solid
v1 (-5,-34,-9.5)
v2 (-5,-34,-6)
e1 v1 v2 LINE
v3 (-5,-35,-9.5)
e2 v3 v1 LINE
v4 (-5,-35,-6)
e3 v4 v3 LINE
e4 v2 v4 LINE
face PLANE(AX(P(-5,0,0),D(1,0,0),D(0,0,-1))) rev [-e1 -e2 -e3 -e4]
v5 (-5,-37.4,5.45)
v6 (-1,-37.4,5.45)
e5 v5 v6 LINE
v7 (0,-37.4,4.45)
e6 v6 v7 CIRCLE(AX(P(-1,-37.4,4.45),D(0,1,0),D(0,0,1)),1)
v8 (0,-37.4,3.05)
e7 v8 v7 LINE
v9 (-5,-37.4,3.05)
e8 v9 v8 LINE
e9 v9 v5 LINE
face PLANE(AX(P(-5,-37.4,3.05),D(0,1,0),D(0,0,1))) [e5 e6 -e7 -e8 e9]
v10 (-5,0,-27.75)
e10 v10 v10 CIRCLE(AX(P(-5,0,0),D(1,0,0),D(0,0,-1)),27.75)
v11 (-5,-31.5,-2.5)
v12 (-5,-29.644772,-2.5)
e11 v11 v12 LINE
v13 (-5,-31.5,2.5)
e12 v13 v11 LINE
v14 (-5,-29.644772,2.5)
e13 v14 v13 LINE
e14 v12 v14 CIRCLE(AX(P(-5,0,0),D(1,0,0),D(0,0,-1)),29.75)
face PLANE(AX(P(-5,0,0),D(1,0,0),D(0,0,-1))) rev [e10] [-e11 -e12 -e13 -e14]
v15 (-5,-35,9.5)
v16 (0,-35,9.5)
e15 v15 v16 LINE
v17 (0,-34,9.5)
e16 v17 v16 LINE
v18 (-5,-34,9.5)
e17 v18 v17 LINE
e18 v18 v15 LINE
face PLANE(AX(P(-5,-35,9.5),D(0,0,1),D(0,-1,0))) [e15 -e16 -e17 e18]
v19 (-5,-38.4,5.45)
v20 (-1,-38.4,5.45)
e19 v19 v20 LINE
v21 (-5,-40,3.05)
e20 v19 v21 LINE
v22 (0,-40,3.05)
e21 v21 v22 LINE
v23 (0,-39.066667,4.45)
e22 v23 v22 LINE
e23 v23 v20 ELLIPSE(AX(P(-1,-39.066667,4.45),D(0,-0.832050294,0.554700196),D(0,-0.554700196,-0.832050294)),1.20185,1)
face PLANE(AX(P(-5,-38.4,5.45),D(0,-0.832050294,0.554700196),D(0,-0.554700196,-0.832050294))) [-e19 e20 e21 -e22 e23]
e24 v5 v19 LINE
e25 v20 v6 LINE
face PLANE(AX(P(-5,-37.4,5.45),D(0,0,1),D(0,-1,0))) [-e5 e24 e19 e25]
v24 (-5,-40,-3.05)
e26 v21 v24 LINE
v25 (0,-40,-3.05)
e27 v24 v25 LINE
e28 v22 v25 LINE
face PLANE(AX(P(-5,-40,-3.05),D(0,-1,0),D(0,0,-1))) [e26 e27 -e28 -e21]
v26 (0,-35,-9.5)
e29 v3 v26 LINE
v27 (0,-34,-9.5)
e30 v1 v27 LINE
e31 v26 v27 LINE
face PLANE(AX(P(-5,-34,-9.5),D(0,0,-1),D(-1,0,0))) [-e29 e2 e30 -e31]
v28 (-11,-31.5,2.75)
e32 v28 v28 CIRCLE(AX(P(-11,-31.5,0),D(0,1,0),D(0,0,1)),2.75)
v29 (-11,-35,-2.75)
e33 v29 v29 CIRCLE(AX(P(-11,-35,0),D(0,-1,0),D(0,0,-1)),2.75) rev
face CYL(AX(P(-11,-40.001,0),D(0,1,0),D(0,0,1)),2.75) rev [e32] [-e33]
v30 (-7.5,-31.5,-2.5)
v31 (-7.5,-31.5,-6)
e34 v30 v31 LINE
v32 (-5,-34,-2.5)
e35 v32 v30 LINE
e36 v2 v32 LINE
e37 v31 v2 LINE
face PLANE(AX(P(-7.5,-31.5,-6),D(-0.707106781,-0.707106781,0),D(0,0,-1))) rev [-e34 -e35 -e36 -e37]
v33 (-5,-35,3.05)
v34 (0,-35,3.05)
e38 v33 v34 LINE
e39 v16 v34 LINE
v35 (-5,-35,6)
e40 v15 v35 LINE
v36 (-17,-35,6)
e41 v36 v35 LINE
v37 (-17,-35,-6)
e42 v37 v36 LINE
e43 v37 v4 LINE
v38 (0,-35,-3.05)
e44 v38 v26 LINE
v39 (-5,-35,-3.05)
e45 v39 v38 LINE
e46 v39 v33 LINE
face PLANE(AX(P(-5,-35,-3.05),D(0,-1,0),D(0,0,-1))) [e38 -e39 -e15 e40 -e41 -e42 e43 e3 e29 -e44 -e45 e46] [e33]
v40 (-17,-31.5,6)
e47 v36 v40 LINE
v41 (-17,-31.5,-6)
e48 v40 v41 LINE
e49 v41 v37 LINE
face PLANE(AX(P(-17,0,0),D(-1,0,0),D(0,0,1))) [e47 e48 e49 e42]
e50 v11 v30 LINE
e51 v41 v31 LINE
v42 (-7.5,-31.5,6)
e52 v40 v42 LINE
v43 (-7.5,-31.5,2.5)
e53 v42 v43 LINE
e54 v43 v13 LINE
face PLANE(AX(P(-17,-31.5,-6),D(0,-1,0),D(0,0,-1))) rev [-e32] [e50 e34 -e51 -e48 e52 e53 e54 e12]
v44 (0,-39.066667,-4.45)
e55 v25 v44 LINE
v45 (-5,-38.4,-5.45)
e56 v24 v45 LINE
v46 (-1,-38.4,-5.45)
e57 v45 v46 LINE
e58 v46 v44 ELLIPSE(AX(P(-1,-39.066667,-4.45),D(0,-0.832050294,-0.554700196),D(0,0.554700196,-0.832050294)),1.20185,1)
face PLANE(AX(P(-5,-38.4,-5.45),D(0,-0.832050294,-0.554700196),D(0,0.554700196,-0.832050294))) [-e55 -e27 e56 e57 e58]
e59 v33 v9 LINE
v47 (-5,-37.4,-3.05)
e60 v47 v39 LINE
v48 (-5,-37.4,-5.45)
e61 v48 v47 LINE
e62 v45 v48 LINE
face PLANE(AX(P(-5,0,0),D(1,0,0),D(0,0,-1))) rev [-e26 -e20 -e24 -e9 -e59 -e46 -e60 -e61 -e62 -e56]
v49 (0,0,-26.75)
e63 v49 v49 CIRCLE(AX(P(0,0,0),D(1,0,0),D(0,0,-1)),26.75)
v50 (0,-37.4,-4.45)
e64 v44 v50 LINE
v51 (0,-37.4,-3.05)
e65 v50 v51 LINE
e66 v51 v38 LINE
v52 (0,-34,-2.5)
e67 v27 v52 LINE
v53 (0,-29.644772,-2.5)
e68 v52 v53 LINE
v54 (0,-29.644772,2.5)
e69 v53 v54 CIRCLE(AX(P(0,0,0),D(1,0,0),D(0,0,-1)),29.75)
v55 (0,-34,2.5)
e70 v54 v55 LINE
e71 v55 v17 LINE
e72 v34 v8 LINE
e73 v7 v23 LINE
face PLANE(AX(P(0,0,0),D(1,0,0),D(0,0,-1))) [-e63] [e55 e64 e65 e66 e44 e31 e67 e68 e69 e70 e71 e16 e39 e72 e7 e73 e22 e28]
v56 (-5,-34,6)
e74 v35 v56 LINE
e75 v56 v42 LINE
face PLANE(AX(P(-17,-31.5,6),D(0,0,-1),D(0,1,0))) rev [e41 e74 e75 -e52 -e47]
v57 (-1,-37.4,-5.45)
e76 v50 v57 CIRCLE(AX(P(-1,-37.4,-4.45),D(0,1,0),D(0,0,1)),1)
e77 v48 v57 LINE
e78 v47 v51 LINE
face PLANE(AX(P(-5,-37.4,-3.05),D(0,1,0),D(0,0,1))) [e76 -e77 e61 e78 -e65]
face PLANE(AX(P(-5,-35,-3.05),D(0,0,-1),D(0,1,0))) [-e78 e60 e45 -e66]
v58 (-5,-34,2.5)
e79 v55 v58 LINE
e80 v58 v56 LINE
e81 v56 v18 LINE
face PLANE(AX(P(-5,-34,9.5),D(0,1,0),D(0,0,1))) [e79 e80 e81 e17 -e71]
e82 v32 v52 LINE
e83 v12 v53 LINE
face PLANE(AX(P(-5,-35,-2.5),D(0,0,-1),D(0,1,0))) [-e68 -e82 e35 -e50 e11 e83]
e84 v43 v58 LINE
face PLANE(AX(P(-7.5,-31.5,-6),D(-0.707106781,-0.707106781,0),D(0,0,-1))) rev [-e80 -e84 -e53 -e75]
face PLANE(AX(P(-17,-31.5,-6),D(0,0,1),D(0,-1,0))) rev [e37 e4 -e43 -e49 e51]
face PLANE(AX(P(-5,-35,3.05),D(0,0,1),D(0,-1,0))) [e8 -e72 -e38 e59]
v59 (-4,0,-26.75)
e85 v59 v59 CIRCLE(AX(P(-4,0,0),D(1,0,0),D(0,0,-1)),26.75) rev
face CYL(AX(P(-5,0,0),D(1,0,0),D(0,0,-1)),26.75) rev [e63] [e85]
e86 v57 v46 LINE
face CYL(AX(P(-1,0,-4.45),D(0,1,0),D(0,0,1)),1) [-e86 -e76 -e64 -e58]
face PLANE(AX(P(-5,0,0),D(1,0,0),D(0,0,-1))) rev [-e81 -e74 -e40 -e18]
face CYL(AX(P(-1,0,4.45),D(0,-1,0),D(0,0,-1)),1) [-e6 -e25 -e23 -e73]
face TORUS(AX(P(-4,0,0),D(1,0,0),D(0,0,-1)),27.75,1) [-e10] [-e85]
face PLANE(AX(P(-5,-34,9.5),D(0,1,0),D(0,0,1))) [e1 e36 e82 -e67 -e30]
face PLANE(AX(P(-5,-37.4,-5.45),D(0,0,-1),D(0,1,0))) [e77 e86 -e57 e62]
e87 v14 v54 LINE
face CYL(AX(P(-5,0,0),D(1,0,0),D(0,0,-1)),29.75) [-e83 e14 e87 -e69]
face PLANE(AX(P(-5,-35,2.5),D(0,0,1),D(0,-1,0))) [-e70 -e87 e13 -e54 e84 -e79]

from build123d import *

# Parameters (mm, degrees)
SKETCH1_R            = 29.75
SKETCH1_R_2          = 26.75
BOSS_EXTRUDE1_DEPTH  = 5
SKETCH2_W            = 5
SKETCH2_H            = 5.355228117
BOSS_EXTRUDE2_DEPTH  = 5
BOSS_EXTRUDE3_DEPTH  = 5
FILLET1_R            = 1
SKETCH38_W           = 12
SKETCH38_H           = 3.5
BOSS_EXTRUDE28_DEPTH = 12
CUT_EXTRUDE3_REACH   = 72.183
SKETCH39_R           = 2.75
CHAMFER1_SIZE        = 2.5
FILLET3_R            = 1


with BuildPart() as part:
    # Sketch1 → Boss-Extrude1 (new body)
    with BuildSketch(Plane(origin=(0, 0, 0), x_dir=(0, 0, -1), z_dir=(1, 0, 0))):
        Circle(SKETCH1_R)
        Circle(SKETCH1_R_2, mode=Mode.SUBTRACT)
    extrude(amount=-BOSS_EXTRUDE1_DEPTH)

    # Sketch2 → Boss-Extrude2 (add)
    with BuildSketch(Plane(origin=(0, 0, 0), x_dir=(0, 0, -1), z_dir=(1, 0, 0))):
        with Locations((0, -32.322385942)):
            Rectangle(SKETCH2_W, SKETCH2_H)
    extrude(amount=-BOSS_EXTRUDE2_DEPTH)

    # Sketch3 → Boss-Extrude3 (add)
    with BuildSketch(Plane(origin=(0, 0, 0), x_dir=(0, 0, -1), z_dir=(1, 0, 0))):
        Polygon((-9.5, -35), (-9.5, -34), (9.5, -34), (9.5, -35), (3.05, -35), (3.05, -37.4), (5.45, -37.4), (5.45, -38.4), (3.05, -40), (-3.05, -40), (-5.45, -38.4), (-5.45, -37.4), (-3.05, -37.4), (-3.05, -35), align=None)
    extrude(amount=-BOSS_EXTRUDE3_DEPTH)

    # Fillet1
    fillet1_edges = [part.edges().sort_by_distance(p)[0] for p in [
        (0, -37.9, 5.45),
        (0, -37.9, -5.45),
    ]]
    fillet(fillet1_edges, radius=FILLET1_R)

    # Sketch38 → Boss-Extrude28 (add)
    with BuildSketch(Plane.ZY.offset(5)):
        with Locations((0, -33.25)):
            Rectangle(SKETCH38_W, SKETCH38_H)
    extrude(amount=BOSS_EXTRUDE28_DEPTH)

    # Sketch39 → Cut-Extrude3 (cut, up to next)
    with BuildSketch(Plane(origin=(0, -31.5, 0), x_dir=(1, 0, 0), z_dir=(0, 1, 0)), mode=Mode.PRIVATE) as cut_extrude3_sk1:
        with Locations(Location((-11, 0, 0), (0, 0, 270))):
            Circle(SKETCH39_R)
    cut_extrude3_tool1 = extrude(cut_extrude3_sk1.sketch, amount=-CUT_EXTRUDE3_REACH, mode=Mode.PRIVATE) & part.part
    add(cut_extrude3_tool1.solids().sort_by_distance((-11, -31.5, 0))[0], mode=Mode.SUBTRACT)

    # Chamfer1
    chamfer1_edges = [part.edges().sort_by_distance(p)[0] for p in [
        (-5, -31.5, 4.25),
        (-5, -31.5, -4.25),
    ]]
    chamfer(chamfer1_edges, length=CHAMFER1_SIZE - 0.0001)  # a hair under: the kernel refuses the full size

    # Fillet3
    fillet3_edges = [part.edges().sort_by_distance(p)[0] for p in [
        (-5, 0, 26.75),
    ]]
    fillet(fillet3_edges, radius=FILLET3_R)


solid = part.part
